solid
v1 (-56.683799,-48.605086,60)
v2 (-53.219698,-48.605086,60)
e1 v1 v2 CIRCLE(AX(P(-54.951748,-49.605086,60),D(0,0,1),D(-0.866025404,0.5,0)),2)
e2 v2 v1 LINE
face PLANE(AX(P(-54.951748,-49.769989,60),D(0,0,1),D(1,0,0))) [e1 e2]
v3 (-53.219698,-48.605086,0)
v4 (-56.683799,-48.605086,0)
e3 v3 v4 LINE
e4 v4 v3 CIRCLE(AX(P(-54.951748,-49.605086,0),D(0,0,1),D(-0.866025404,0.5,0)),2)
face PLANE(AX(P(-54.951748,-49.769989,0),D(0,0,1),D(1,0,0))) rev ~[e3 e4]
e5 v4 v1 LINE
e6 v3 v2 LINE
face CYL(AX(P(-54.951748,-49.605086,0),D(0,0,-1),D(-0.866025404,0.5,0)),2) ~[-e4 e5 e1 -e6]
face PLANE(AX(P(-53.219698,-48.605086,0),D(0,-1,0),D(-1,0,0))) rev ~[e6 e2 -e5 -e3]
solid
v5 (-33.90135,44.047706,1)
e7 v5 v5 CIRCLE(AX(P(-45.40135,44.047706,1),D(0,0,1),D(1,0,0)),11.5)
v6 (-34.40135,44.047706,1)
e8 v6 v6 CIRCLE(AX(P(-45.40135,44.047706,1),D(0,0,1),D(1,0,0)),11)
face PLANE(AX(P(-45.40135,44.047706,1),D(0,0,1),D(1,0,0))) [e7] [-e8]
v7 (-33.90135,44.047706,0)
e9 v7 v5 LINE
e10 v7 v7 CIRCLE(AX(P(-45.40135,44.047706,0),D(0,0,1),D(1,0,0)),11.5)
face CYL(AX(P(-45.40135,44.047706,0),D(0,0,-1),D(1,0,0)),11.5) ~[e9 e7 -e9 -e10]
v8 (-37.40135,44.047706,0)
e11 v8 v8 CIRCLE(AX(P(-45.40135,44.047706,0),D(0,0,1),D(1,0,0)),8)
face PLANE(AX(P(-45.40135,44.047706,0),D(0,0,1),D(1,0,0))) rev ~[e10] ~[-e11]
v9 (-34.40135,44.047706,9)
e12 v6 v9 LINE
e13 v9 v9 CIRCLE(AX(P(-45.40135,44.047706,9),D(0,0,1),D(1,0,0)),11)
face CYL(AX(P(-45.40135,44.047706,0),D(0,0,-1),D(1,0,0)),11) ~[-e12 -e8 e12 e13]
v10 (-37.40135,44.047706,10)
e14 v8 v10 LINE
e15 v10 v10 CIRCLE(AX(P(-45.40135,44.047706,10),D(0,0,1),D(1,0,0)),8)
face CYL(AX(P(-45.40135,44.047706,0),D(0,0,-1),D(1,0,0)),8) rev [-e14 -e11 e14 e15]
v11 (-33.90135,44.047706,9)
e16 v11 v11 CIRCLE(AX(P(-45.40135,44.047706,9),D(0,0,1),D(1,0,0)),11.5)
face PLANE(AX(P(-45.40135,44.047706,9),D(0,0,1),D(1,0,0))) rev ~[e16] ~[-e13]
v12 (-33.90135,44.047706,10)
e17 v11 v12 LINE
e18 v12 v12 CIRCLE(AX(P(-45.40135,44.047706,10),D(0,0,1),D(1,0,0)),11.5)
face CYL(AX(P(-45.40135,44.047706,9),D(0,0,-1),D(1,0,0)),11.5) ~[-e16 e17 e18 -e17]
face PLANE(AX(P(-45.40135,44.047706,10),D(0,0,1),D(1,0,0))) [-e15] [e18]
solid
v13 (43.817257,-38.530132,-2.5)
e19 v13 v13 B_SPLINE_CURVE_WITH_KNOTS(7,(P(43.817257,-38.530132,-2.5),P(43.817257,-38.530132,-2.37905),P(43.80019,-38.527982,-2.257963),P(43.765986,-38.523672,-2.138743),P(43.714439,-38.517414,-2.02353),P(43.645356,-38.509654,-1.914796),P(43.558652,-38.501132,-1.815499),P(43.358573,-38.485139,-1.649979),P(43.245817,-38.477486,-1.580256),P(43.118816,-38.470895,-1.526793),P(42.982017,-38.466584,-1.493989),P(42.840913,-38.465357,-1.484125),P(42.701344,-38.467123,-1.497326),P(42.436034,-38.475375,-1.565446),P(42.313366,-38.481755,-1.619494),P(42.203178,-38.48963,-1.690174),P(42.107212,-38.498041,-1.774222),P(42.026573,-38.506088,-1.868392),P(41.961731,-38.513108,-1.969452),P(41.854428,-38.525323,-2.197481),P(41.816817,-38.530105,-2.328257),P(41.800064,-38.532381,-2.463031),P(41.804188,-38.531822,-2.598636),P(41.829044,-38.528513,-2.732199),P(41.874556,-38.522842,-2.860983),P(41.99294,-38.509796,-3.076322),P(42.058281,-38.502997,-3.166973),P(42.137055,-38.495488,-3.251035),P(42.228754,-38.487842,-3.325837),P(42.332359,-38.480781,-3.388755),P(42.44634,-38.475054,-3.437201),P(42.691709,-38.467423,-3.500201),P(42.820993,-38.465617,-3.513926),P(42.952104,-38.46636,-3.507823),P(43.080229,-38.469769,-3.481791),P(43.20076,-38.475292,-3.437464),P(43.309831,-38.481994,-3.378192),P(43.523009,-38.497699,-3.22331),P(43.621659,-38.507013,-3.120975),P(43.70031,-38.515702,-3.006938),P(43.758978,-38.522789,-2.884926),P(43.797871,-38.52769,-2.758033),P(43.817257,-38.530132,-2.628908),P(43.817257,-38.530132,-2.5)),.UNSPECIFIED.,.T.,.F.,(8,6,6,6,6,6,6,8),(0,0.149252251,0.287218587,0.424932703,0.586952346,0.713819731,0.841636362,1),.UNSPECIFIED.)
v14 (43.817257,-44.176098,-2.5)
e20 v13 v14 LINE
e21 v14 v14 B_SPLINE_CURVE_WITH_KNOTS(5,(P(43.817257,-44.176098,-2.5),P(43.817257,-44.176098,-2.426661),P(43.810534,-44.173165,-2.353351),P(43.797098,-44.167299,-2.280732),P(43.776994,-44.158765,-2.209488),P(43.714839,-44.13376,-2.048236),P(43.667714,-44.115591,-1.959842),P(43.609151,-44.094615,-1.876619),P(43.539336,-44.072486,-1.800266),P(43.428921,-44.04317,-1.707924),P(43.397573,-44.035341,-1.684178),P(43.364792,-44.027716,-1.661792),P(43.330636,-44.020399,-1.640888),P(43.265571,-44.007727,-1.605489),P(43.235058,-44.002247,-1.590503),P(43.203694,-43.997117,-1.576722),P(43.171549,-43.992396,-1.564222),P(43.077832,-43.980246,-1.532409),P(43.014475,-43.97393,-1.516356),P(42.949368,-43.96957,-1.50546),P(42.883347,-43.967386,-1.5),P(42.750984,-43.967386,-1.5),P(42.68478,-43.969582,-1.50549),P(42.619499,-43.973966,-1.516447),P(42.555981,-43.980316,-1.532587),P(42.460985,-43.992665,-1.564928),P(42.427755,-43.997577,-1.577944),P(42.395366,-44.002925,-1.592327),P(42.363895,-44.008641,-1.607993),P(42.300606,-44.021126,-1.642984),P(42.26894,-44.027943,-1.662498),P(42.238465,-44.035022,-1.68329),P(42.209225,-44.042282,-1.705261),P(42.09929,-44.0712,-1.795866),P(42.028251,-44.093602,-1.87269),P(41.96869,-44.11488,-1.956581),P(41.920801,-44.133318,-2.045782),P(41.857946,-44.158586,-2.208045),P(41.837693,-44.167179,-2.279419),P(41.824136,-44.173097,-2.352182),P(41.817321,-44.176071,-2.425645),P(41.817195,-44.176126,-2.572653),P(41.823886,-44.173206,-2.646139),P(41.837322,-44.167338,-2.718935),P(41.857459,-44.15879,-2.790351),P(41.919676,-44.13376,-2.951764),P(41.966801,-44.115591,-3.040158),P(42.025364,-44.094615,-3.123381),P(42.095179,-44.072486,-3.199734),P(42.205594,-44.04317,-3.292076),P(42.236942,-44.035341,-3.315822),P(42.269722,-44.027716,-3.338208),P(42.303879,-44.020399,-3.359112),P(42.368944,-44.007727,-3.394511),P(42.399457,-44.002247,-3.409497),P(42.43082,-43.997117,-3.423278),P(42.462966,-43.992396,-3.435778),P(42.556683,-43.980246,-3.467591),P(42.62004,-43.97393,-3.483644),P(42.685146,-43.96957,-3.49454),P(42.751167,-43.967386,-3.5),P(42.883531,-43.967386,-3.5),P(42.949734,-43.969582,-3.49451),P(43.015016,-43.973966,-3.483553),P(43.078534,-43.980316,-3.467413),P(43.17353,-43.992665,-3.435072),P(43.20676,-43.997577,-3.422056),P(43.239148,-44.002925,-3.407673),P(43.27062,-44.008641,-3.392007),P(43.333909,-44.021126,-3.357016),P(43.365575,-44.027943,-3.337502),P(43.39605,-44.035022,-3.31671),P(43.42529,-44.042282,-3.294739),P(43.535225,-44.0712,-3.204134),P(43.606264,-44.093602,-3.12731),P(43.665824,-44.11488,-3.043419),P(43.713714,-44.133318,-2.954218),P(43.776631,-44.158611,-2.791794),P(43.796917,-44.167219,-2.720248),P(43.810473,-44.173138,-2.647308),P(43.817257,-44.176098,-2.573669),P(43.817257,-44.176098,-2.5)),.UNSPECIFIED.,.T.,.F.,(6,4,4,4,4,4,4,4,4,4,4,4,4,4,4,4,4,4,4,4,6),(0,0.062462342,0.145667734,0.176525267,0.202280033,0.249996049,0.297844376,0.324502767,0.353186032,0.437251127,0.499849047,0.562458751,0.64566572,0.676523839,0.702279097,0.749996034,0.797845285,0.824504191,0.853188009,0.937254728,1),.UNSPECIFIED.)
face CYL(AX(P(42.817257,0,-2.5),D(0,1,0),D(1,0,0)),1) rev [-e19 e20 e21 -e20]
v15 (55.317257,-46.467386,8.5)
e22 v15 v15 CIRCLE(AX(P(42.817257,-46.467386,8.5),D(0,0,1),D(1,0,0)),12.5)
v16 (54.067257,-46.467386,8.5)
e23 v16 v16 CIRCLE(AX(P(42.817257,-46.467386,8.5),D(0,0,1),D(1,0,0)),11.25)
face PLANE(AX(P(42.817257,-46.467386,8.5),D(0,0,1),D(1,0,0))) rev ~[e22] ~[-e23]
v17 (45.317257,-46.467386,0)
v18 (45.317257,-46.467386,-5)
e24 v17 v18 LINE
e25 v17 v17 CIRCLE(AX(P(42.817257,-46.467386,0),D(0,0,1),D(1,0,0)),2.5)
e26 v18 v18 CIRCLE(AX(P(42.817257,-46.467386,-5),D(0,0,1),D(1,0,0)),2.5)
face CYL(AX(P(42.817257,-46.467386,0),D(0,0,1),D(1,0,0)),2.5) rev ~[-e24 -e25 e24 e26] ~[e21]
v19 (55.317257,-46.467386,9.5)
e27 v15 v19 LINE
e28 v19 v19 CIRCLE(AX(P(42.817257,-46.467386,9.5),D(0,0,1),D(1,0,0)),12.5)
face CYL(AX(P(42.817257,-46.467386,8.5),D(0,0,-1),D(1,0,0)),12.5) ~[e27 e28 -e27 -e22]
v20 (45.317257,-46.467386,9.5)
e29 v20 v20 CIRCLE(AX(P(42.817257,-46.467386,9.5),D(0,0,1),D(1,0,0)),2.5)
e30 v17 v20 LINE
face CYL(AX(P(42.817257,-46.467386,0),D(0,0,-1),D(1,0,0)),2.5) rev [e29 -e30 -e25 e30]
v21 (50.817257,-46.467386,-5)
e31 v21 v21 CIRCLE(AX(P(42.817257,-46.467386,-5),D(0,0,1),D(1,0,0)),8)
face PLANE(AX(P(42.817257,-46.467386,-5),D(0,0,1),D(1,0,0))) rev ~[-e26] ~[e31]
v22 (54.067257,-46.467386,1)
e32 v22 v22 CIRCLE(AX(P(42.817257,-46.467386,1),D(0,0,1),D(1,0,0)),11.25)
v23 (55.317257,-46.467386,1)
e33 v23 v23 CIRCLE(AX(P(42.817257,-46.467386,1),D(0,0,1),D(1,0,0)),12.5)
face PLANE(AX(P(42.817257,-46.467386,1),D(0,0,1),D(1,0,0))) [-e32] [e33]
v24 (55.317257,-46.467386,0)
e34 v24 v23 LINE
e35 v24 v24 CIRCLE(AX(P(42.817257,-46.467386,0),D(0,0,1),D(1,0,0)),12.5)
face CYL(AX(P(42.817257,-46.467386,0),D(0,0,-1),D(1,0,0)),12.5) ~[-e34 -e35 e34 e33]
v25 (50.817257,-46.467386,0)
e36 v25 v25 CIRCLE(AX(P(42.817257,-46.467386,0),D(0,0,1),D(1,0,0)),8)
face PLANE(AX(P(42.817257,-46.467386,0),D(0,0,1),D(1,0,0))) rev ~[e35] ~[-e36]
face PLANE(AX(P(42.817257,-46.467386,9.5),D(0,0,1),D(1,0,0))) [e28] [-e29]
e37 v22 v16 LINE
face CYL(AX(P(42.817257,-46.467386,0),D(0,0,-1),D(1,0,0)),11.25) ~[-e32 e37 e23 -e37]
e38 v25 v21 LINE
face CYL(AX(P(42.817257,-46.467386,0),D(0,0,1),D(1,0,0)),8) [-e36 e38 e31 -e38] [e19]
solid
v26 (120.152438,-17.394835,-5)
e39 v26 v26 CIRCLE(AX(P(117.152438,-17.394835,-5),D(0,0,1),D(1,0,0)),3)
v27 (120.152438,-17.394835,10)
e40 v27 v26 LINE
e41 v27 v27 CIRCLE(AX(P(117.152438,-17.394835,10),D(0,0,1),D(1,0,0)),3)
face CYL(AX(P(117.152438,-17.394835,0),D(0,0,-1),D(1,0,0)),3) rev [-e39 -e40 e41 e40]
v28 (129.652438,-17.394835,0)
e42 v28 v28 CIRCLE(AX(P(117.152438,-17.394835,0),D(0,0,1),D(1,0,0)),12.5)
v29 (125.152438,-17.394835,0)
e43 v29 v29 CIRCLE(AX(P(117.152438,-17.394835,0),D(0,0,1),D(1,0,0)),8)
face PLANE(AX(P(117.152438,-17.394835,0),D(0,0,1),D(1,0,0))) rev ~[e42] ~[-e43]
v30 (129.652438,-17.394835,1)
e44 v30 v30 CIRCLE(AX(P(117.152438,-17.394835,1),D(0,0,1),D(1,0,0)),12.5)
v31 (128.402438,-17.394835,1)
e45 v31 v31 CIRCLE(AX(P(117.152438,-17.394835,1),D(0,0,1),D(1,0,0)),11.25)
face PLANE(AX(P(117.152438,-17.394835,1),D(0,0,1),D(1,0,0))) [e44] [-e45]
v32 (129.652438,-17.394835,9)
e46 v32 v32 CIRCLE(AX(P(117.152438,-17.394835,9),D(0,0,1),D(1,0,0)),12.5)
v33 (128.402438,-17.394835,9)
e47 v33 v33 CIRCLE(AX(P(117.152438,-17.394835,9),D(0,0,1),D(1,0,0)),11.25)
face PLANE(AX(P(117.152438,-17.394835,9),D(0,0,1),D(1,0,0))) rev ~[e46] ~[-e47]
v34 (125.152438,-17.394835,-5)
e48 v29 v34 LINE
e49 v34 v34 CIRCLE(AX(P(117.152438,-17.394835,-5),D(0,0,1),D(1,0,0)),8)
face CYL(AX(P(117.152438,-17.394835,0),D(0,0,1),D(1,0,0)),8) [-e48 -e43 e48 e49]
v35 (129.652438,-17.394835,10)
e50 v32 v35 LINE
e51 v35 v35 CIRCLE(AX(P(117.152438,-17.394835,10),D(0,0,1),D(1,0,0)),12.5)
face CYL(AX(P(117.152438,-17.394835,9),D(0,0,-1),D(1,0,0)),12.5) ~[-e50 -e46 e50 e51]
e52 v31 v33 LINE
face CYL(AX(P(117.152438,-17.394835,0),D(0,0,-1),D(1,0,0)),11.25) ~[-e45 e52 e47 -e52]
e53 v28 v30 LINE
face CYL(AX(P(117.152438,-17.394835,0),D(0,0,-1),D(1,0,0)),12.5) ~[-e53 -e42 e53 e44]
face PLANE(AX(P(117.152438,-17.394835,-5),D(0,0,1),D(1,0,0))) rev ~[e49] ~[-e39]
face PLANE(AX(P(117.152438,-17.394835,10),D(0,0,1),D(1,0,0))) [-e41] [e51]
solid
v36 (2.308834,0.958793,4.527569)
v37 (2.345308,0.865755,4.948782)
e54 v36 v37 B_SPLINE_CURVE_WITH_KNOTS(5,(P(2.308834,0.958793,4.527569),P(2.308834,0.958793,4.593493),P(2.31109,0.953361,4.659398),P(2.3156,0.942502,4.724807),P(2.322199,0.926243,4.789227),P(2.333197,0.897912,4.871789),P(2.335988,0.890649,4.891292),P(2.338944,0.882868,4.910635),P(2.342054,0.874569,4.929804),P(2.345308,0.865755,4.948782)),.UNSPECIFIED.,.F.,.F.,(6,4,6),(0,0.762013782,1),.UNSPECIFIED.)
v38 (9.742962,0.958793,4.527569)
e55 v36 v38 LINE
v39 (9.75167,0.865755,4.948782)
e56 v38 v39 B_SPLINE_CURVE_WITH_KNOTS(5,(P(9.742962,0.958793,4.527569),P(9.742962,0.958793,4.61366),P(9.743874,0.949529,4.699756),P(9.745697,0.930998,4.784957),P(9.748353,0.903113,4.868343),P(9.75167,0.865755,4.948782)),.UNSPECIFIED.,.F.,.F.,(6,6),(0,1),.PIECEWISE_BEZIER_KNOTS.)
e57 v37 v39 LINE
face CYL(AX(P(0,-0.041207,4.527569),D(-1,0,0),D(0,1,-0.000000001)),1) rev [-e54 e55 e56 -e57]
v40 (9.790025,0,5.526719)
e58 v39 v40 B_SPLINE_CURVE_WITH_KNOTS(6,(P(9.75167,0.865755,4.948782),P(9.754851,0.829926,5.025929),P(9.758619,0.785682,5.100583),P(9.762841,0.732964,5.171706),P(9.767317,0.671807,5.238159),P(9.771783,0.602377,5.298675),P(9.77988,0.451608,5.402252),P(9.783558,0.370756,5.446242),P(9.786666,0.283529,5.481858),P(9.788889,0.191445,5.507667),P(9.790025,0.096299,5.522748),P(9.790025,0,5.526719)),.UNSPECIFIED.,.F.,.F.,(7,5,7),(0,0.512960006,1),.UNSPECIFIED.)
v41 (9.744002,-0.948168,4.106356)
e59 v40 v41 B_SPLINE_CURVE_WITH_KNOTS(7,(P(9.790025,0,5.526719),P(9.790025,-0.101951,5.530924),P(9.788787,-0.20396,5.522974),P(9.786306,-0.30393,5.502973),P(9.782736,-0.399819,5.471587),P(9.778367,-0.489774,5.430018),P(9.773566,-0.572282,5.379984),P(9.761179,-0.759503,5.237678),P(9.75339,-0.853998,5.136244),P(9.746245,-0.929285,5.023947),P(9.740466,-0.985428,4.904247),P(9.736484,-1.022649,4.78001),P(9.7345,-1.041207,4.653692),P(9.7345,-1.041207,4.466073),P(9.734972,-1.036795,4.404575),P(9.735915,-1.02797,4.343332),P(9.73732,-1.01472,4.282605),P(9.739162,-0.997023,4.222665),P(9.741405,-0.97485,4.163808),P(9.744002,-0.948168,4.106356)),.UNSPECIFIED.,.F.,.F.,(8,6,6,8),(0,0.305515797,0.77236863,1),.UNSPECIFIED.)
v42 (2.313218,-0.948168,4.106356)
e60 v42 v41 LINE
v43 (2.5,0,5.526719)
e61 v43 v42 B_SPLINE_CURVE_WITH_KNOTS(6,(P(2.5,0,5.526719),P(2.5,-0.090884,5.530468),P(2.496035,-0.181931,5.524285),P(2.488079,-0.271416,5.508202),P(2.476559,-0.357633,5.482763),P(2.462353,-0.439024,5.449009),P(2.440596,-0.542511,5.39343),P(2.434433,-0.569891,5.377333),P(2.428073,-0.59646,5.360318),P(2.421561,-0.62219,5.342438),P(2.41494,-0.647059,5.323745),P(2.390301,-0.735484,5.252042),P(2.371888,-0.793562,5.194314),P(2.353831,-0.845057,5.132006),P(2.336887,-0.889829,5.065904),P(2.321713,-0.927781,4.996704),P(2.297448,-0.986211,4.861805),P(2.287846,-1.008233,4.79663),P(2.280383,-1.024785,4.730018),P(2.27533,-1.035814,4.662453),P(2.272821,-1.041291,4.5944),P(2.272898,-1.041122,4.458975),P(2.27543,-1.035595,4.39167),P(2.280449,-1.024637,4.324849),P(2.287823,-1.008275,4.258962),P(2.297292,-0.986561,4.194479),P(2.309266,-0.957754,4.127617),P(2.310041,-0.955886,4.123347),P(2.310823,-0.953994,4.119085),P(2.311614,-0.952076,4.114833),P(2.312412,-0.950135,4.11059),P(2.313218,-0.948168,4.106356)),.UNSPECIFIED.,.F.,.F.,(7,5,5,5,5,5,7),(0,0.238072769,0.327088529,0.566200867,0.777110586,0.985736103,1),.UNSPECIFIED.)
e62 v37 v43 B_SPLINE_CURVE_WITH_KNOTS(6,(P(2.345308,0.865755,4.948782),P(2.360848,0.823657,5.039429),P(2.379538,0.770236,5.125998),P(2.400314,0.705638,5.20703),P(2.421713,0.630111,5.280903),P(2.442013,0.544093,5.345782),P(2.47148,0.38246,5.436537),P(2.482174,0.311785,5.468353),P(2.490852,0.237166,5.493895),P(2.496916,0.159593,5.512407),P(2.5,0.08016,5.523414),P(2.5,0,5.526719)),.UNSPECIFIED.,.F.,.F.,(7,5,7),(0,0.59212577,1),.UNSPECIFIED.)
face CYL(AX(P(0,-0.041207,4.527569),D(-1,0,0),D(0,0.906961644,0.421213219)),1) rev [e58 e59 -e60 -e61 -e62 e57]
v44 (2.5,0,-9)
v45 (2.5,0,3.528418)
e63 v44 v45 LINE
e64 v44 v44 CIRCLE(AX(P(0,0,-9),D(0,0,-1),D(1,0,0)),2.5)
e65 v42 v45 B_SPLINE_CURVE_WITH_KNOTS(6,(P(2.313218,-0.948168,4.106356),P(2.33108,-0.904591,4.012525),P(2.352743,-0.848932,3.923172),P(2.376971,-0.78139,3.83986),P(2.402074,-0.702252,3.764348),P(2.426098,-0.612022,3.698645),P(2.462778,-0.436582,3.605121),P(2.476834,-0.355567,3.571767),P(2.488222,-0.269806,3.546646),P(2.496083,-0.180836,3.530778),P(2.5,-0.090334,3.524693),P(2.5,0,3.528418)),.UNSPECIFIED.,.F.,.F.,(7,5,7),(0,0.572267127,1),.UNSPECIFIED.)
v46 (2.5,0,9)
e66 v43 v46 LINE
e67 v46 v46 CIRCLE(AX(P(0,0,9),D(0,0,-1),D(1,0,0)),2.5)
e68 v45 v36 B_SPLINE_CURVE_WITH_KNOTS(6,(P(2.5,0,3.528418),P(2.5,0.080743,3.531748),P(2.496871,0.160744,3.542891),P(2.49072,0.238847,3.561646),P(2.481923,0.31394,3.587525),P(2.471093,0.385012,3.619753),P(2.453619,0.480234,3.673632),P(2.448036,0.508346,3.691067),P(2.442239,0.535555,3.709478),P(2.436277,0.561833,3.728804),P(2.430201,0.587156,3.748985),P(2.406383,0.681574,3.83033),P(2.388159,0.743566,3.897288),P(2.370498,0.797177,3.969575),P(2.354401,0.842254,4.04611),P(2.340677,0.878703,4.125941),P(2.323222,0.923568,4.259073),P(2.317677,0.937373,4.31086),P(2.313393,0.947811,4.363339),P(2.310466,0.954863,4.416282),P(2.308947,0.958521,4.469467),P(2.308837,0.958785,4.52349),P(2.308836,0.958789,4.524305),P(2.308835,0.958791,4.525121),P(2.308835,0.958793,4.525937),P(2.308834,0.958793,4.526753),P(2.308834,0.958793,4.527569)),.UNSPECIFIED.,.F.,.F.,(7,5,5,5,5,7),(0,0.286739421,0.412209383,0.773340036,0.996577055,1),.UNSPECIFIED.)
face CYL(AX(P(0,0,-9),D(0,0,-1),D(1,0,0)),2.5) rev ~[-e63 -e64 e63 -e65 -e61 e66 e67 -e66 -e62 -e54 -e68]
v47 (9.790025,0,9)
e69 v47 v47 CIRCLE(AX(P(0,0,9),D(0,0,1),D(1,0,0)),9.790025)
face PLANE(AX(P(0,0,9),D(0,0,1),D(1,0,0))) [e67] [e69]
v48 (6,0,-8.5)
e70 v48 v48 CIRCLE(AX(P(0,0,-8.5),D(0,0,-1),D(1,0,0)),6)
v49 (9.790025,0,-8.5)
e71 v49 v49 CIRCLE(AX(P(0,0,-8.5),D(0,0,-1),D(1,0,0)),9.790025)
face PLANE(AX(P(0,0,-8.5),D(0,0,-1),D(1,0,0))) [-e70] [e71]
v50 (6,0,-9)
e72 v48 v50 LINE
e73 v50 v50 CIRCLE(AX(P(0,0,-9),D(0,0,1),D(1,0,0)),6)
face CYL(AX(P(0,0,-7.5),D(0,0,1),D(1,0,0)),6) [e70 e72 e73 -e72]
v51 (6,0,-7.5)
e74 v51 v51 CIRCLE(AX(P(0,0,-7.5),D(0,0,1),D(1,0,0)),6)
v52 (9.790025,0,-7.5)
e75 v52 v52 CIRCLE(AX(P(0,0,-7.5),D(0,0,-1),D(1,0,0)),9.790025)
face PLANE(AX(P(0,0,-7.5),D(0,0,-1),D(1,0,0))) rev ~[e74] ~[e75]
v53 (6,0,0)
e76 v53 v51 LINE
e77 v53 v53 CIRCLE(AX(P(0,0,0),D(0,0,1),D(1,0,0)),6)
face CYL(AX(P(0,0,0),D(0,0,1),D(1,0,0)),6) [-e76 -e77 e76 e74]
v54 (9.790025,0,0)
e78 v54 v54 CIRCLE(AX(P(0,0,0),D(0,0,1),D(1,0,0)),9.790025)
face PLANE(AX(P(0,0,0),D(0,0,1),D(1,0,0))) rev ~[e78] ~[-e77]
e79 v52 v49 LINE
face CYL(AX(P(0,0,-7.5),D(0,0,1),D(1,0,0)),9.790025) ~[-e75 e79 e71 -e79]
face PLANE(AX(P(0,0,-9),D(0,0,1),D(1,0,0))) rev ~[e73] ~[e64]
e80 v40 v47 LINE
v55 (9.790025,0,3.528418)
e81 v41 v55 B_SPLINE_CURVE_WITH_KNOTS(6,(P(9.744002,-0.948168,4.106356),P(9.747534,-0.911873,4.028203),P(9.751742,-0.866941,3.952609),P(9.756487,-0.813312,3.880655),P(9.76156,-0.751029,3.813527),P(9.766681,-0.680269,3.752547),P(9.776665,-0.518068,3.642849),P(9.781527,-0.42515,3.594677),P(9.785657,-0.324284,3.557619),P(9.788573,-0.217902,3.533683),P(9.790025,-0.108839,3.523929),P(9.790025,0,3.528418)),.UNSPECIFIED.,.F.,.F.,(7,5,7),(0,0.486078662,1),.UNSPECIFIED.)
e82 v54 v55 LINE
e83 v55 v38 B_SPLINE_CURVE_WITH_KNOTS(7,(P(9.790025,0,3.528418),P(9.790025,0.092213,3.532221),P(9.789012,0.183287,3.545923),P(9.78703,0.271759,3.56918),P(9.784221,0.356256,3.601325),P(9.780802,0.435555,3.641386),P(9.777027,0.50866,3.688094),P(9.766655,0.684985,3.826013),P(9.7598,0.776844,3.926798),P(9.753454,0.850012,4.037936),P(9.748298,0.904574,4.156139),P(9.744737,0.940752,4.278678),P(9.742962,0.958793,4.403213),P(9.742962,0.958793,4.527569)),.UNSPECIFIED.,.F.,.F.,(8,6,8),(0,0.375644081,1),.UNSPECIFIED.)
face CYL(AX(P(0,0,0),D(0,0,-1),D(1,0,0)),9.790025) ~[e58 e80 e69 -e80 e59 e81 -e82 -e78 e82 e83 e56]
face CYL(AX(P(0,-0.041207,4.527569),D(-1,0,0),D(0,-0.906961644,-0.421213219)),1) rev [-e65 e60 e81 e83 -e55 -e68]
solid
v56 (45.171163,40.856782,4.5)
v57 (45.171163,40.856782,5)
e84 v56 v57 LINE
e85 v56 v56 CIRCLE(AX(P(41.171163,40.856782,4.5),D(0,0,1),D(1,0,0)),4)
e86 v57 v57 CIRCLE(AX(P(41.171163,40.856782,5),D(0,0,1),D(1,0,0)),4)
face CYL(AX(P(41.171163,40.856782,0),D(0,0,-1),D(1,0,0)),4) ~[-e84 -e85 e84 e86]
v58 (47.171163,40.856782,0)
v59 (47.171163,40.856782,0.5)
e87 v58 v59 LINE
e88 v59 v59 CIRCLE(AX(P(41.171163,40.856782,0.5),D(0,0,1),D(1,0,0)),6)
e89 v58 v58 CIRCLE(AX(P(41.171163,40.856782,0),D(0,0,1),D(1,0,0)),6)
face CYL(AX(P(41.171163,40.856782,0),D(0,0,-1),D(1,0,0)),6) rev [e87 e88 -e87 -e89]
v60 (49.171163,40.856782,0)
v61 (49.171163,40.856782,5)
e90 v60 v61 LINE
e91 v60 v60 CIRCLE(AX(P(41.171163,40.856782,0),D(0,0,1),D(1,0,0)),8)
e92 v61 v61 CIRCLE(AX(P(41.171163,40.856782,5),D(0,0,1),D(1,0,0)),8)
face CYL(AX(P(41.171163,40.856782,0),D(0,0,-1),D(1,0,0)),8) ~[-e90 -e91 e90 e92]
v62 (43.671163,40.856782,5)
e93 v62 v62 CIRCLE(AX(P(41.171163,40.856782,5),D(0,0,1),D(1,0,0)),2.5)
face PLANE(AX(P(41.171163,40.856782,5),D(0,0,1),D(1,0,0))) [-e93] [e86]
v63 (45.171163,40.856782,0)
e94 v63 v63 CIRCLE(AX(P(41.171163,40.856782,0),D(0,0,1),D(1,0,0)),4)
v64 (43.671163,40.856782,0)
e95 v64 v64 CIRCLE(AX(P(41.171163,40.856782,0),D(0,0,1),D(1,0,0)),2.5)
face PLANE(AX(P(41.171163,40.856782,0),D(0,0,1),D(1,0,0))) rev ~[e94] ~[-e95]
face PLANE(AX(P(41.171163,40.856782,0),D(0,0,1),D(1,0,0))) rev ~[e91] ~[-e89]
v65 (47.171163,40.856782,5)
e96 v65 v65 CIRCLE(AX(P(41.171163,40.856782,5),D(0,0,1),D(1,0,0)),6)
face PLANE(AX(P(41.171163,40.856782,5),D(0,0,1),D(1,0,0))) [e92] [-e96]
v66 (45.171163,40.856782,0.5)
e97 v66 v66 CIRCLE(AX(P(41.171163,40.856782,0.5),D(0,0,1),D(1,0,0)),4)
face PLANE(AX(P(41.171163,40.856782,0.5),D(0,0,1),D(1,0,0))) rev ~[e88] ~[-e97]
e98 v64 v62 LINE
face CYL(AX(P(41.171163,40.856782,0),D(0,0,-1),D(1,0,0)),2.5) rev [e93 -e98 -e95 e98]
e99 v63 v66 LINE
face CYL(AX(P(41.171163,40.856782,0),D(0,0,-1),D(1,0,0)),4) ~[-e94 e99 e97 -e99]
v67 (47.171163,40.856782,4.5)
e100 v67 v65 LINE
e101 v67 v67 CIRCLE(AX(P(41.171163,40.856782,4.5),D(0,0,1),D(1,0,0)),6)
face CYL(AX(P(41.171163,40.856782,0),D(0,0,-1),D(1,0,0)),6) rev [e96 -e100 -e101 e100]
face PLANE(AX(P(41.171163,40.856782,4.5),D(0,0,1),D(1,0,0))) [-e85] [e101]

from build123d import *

# Parameters (mm, degrees)
F21_R     = 9.790025198
F21_R_2   = 6
F0_DEPTH  = 9
F1_DEPTH  = 7.5
F22_R     = 9.790025198
F22_R_2   = 6
F2_DEPTH  = 1
F23_DEPTH = 1.5
F3_R      = 2.5
F4_DEPTH  = 18
F5_R      = 11
F5_R_2    = 8
F24_DEPTH = 10
F5_R_3    = 11.5
F25_DEPTH = 1
F26_START = 9
F26_DEPTH = 1
F6_R      = 11.25
F6_R_2    = 8
F6_R_3    = 2.5
F7_DEPTH  = 9.5
F6_R_4    = 12.5
F27_DEPTH = 1
F28_START = 8.5
F28_DEPTH = 1
F8_DEPTH  = 5
F9_R      = 1
F29_DEPTH = 44.5731431246
F11_DEPTH = 10.3096459061
F12_R     = 8
F12_R_2   = 6
F30_DEPTH = 5
F12_R_3   = 4
F12_R_4   = 2.5
F13_START = 0.5
F13_DEPTH = 4
F15_DEPTH = 60
F16_R     = 11.25
F16_R_2   = 8
F16_R_3   = 3
F17_DEPTH = 10
F18_DEPTH = 5
F16_R_4   = 12.5
F19_DEPTH = 1
F20_START = 9
F20_DEPTH = 1


with BuildPart() as f0:
    # F21 (on Top) → F0 (new body)
    with BuildSketch(Plane.XY):
        Circle(F21_R)
        Circle(F21_R_2, mode=Mode.SUBTRACT)
        Circle(F21_R_2)
    extrude(amount=F0_DEPTH)

    # F21 (on Top) → F1 (join)
    with BuildSketch(Plane.XY):
        Circle(F21_R_2)
    extrude(amount=-F1_DEPTH)

    # F22 (on face) → F2 (join)
    with BuildSketch(Plane(origin=(0, 0, -7.5), x_dir=(1, 0, 0), z_dir=(0, 0, -1))):
        Circle(F22_R)
        Circle(F22_R_2, mode=Mode.SUBTRACT)
    extrude(amount=F2_DEPTH)

    # F23 (add): a face of the model
    f23_faces = [f0.faces().sort_by_distance(p)[0] for p in [
        (0, 0, -7.5),
    ]]
    extrude(f23_faces, amount=F23_DEPTH)

    # F3 (on face) → F4 (cut, through all)
    with BuildSketch(Plane(origin=(0, 0, -9), x_dir=(1, 0, 0), z_dir=(0, 0, -1))):
        Circle(F3_R)
    extrude(amount=-F4_DEPTH, mode=Mode.SUBTRACT)

    # F10 (on Right) → F11 (cut)
    with BuildSketch(Plane.YZ):
        with BuildLine():
            ThreePointArc((0.9587933937, 4.5275688171), (0.9352568197, 4.7432518666), (0.865755038, 4.948782036))
            Line((0.865755038, 4.948782036), (-0.9481682506, 4.1063555983))
            ThreePointArc((-0.9481682506, 4.1063555983), (0.1744764432, 3.5511053912), (0.9587933937, 4.5275688171))
        make_face()
        with BuildLine():
            Line((-0.9481682506, 4.1063555983), (0.865755038, 4.948782036))
            ThreePointArc((0.865755038, 4.948782036), (-0.4624198251, 5.4345304615), (-0.9481682506, 4.1063555983))
        make_face()
    extrude(amount=F11_DEPTH, mode=Mode.SUBTRACT)


with BuildPart() as f24:
    # F5 (on Top) → F24 (new body)
    with BuildSketch(Plane.XY):
        with Locations((-45.4013496637, 44.0477058291)):
            Circle(F5_R)
        with Locations((-45.4013496637, 44.0477058291)):
            Circle(F5_R_2, mode=Mode.SUBTRACT)
    extrude(amount=F24_DEPTH)

    # F5 (on Top) → F25 (join)
    with BuildSketch(Plane.XY):
        with Locations((-45.4013496637, 44.0477058291)):
            Circle(F5_R_3)
        with Locations((-45.4013496637, 44.0477058291)):
            Circle(F5_R, mode=Mode.SUBTRACT)
    extrude(amount=F25_DEPTH)

    # F5 (on Top) → F26 (join)
    with BuildSketch(Plane.XY.offset(F26_START)):
        with Locations((-45.4013496637, 44.0477058291)):
            Circle(F5_R_3)
        with Locations((-45.4013496637, 44.0477058291)):
            Circle(F5_R, mode=Mode.SUBTRACT)
    extrude(amount=F26_DEPTH)


with BuildPart() as f7:
    # F6 (on Top) → F7 (new body)
    with BuildSketch(Plane.XY):
        with Locations((42.8172573447, -46.4673861861)):
            Circle(F6_R)
        with Locations((42.8172573447, -46.4673861861)):
            Circle(F6_R_2, mode=Mode.SUBTRACT)
        with Locations((42.8172573447, -46.4673861861)):
            Circle(F6_R_2)
        with Locations((42.8172573447, -46.4673861861)):
            Circle(F6_R_3, mode=Mode.SUBTRACT)
    extrude(amount=F7_DEPTH)

    # F6 (on Top) → F27 (join)
    with BuildSketch(Plane.XY):
        with Locations((42.8172573447, -46.4673861861)):
            Circle(F6_R_4)
        with Locations((42.8172573447, -46.4673861861)):
            Circle(F6_R, mode=Mode.SUBTRACT)
    extrude(amount=F27_DEPTH)

    # F6 (on Top) → F28 (join)
    with BuildSketch(Plane.XY.offset(F28_START)):
        with Locations((42.8172573447, -46.4673861861)):
            Circle(F6_R_4)
        with Locations((42.8172573447, -46.4673861861)):
            Circle(F6_R, mode=Mode.SUBTRACT)
    extrude(amount=F28_DEPTH)

    # F6 (on Top) → F8 (join)
    with BuildSketch(Plane.XY):
        with Locations((42.8172573447, -46.4673861861)):
            Circle(F6_R_2)
        with Locations((42.8172573447, -46.4673861861)):
            Circle(F6_R_3, mode=Mode.SUBTRACT)
    extrude(amount=-F8_DEPTH)

    # F9 (on Front) → F29 (cut)
    with BuildSketch(Plane.XZ):
        with Locations((42.8172573447, -2.5)):
            Circle(F9_R)
    extrude(amount=F29_DEPTH, mode=Mode.SUBTRACT)


with BuildPart() as f30:
    # F12 (on Top) → F30 (new body)
    with BuildSketch(Plane.XY):
        with Locations((41.1711633205, 40.856782347)):
            Circle(F12_R)
        with Locations((41.1711633205, 40.856782347)):
            Circle(F12_R_2, mode=Mode.SUBTRACT)
    extrude(amount=F30_DEPTH)



with BuildPart() as f30b:
    # F12 (on Top) → F30, piece 2 (new body)
    with BuildSketch(Plane.XY):
        with Locations((41.1711633205, 40.856782347)):
            Circle(F12_R_3)
        with Locations((41.1711633205, 40.856782347)):
            Circle(F12_R_4, mode=Mode.SUBTRACT)
    extrude(amount=F30_DEPTH)


with BuildPart() as f30_1:
    add(f30.part)

    add(f30b.part)  # F13 merges F30b
    # F12 (on Top) → F13 (join)
    with BuildSketch(Plane.XY.offset(F13_START)):
        with Locations((41.1711633205, 40.856782347)):
            Circle(F12_R_2)
        with Locations((41.1711633205, 40.856782347)):
            Circle(F12_R_3, mode=Mode.SUBTRACT)
    extrude(amount=F13_DEPTH)


with BuildPart() as f15:
    # F14 (on Top) → F15 (new body)
    with BuildSketch(Plane.XY):
        with BuildLine():
            Line((-53.2196976006, -48.6050862481), (-56.6837992158, -48.6050862481))
            ThreePointArc((-56.6837992158, -48.6050862481), (-54.9517484082, -51.6050862481), (-53.2196976006, -48.6050862481))
        make_face()
    extrude(amount=F15_DEPTH)


with BuildPart() as f17:
    # F16 (on Top) → F17 (new body)
    with BuildSketch(Plane.XY):
        with Locations((117.1524375677, -17.3948351294)):
            Circle(F16_R)
        with Locations((117.1524375677, -17.3948351294)):
            Circle(F16_R_2, mode=Mode.SUBTRACT)
        with Locations((117.1524375677, -17.3948351294)):
            Circle(F16_R_2)
        with Locations((117.1524375677, -17.3948351294)):
            Circle(F16_R_3, mode=Mode.SUBTRACT)
    extrude(amount=F17_DEPTH)

    # F16 (on Top) → F18 (join)
    with BuildSketch(Plane.XY):
        with Locations((117.1524375677, -17.3948351294)):
            Circle(F16_R_2)
        with Locations((117.1524375677, -17.3948351294)):
            Circle(F16_R_3, mode=Mode.SUBTRACT)
    extrude(amount=-F18_DEPTH)

    # F16 (on Top) → F19 (join)
    with BuildSketch(Plane.XY):
        with Locations((117.1524375677, -17.3948351294)):
            Circle(F16_R_4)
        with Locations((117.1524375677, -17.3948351294)):
            Circle(F16_R, mode=Mode.SUBTRACT)
    extrude(amount=F19_DEPTH)

    # F16 (on Top) → F20 (join)
    with BuildSketch(Plane.XY.offset(F20_START)):
        with Locations((117.1524375677, -17.3948351294)):
            Circle(F16_R_4)
        with Locations((117.1524375677, -17.3948351294)):
            Circle(F16_R, mode=Mode.SUBTRACT)
    extrude(amount=F20_DEPTH)


solid = Compound([f0.part, f24.part, f7.part, f30_1.part, f15.part, f17.part])
